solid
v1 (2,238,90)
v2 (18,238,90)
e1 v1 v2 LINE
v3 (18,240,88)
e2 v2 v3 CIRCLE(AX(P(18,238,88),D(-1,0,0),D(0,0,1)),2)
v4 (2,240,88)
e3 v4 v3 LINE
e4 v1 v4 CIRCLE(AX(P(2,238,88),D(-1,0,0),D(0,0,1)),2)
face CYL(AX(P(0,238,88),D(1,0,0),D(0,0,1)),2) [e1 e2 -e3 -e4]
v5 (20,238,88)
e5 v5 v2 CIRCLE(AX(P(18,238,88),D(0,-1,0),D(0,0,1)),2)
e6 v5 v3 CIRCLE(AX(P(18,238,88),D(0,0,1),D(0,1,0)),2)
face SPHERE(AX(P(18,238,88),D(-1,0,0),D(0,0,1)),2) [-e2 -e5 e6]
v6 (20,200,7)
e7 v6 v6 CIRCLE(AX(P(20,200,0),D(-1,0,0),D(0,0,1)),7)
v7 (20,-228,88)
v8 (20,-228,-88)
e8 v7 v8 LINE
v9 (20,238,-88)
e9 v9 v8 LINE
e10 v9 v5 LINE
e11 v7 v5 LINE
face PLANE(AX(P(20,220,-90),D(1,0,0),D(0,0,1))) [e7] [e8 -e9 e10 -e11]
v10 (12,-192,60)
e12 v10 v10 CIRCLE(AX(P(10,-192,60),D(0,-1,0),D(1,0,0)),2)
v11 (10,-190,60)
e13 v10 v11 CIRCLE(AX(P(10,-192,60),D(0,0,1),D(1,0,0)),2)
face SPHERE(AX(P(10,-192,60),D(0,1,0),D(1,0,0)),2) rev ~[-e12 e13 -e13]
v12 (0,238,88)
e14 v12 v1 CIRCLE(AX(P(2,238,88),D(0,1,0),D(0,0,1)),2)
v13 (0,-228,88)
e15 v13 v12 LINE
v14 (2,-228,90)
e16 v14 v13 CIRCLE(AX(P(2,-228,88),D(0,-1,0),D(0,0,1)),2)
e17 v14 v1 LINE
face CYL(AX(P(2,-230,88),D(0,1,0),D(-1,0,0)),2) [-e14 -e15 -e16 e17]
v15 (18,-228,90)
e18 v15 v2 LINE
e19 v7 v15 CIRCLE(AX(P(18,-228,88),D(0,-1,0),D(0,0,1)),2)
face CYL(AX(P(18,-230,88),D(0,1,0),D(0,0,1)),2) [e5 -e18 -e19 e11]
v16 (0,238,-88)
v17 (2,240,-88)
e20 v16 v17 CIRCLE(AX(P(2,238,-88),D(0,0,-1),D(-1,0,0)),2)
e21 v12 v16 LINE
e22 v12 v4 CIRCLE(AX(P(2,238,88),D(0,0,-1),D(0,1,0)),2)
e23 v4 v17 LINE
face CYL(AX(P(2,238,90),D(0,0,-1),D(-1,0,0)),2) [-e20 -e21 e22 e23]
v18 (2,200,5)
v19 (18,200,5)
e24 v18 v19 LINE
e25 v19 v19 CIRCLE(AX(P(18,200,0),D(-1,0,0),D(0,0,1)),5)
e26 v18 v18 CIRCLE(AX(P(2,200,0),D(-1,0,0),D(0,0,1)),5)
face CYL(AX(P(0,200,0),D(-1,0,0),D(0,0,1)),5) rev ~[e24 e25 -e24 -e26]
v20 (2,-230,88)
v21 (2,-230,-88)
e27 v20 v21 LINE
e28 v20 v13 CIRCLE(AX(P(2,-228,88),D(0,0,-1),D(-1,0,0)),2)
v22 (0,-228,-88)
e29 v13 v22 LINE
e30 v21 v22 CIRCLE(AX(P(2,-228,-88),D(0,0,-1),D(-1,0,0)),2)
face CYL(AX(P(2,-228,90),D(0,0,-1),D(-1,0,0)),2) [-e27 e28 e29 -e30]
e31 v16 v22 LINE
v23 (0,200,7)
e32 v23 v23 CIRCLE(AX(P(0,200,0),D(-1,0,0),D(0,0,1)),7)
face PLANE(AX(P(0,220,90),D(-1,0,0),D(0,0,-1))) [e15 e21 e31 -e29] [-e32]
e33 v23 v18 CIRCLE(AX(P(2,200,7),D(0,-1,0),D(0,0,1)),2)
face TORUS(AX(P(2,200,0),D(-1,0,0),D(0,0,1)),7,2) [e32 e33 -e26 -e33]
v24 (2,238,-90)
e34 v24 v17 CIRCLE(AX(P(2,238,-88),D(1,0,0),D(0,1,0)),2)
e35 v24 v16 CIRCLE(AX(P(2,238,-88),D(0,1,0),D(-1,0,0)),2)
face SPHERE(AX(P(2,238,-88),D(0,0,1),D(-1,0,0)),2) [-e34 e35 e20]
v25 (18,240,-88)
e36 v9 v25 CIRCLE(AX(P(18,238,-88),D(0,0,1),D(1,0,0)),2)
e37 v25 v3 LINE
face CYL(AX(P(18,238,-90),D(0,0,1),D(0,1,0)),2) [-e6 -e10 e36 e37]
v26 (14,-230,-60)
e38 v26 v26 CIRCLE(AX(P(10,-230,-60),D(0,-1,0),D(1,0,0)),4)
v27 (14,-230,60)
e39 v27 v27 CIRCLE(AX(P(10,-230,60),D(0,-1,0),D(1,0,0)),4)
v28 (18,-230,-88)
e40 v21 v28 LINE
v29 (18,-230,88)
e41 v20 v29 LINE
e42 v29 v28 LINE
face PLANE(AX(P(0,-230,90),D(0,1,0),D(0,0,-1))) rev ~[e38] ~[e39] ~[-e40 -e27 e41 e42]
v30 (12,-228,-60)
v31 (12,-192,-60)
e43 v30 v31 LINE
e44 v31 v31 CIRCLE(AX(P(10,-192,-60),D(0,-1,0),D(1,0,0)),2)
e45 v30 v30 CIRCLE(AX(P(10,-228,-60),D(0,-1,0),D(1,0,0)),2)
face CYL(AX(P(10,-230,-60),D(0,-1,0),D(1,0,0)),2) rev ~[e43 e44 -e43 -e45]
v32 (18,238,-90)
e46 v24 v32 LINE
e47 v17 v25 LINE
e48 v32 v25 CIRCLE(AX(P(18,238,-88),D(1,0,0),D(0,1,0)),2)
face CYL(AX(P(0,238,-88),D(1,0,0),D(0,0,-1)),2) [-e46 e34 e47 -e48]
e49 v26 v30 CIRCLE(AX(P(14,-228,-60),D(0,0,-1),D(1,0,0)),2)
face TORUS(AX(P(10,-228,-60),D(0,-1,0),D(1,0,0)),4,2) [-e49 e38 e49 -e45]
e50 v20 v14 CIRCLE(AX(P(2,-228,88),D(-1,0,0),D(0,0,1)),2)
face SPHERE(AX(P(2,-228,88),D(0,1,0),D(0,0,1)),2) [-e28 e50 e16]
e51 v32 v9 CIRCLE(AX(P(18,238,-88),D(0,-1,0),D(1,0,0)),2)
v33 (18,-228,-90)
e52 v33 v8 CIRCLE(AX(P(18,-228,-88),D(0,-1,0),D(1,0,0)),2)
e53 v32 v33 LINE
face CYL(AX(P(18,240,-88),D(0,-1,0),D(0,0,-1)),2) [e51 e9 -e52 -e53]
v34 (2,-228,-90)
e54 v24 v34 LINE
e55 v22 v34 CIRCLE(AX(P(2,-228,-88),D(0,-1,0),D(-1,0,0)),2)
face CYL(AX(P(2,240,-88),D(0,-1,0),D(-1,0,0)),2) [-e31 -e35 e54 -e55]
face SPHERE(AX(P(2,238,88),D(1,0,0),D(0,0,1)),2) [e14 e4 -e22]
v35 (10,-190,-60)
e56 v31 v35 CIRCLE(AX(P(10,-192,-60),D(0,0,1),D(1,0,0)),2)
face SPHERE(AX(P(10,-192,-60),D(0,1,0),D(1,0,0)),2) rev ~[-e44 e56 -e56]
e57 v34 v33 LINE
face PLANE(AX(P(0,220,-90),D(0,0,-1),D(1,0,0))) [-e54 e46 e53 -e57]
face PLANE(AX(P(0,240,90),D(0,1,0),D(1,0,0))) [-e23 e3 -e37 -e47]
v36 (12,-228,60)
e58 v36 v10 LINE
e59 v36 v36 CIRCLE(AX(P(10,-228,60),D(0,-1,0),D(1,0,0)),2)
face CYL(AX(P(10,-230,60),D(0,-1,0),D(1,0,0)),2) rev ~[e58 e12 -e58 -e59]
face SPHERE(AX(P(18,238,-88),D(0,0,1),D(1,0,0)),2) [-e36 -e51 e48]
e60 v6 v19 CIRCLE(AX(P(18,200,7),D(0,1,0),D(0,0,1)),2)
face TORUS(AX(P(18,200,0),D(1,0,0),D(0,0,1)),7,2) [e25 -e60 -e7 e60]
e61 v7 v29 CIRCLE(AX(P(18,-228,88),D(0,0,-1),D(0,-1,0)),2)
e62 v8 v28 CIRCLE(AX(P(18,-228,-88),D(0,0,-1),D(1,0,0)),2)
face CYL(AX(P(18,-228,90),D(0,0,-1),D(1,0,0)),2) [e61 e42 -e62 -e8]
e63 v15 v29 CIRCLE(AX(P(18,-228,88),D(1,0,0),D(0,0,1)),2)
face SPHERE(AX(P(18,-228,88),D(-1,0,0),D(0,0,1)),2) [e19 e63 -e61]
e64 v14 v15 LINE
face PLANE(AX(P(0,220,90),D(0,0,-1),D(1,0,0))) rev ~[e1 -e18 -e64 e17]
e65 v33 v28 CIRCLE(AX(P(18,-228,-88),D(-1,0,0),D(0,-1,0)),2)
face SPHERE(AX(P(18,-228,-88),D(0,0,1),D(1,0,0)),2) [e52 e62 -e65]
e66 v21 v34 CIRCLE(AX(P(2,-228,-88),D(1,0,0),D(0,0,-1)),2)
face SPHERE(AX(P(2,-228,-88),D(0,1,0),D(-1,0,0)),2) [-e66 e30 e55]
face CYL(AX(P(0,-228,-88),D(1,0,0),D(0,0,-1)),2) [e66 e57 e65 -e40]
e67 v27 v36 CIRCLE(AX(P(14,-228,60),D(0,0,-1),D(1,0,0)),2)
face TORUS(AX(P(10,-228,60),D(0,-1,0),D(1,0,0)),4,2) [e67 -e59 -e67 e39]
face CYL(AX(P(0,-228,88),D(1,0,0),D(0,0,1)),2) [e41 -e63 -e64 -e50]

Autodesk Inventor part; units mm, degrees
ref_plane "YZ Plane" through (0, 0, 0) normal (1, 0, 0) x (0, 1, 0)
ref_plane "XZ Plane" through (0, 0, 0) normal (0, 1, 0) x (-1, 0, 0)
ref_plane "XY Plane" through (0, 0, 0) normal (0, 0, 1) x (1, 0, 0)
sketch "草图1" plane through (0, 0, 0) normal (1, 0, 0) x (0, 1, 0)
  line L0 (230, 90) -> (-230, 90)
  line L1 (-230, 90) -> (-230, -90)
  line L2 (-230, -90) -> (230, -90)
  line L3 (230, -90) -> (230, 90)
  point P0 (0, 0)
  dimension "d0" = 460
  dimension "d1" = 180
extrude "拉伸1" add sketch "草图1" along normal blind 20
sketch "草图2" plane through (0, -230, -90) normal (0, -1, 0) x (1, 0, 0)
  circle A0 centre (10, 30) radius 2
  point P0 (0, 90)
  dimension "d4" = 4
extrude "拉伸2" cut sketch "草图2" against normal blind 40
sketch "草图3" plane through (0, -230, -90) normal (0, -1, 0) x (1, 0, 0)
  circle A0 centre (10, 150) radius 2
  point P0 (0, 90)
  dimension "d7" = 4
extrude "拉伸3" cut sketch "草图3" against normal blind 40
sketch "草图4" plane through (0, 230, 90) normal (0, 1, 0) x (1, 0, 0)
  line L0 (20, 0) -> (20, 180) projected
  line L1 (0, 0) -> (20, 0)
  line L2 (20, 0) -> (20, 180)
  line L3 (20, 180) -> (0, 180)
  line L4 (0, 180) -> (0, 0)
  point P0 (0, 90)
extrude "拉伸4" cut sketch "草图4" against normal blind 60
sketch "草图5" plane through (0, 170, 90) normal (0, 1, 0) x (1, 0, 0)
  line L0 (0, 0) -> (0, 180) projected
  line L1 (0, 0) -> (20, 0) projected
  line L2 (0, 180) -> (20, 180)
  line L3 (20, 180) -> (20, 0)
  line L4 (20, 0) -> (0, 0)
  line L5 (0, 0) -> (0, 180)
  point P0 (0, 90)
extrude "拉伸5" add sketch "草图5" along normal blind 50
sketch "草图6" plane through (0, 0, 0) normal (-1, 0, 0) x (0, 0, 1)
  circle A0 centre (0, 200) radius 5
  point P0 (0, 0)
  dimension "d14" = 10
extrude "拉伸6" cut sketch "草图6" against normal through all
sketch "草图7" plane through (0, 220, 90) normal (0, 1, 0) x (1, 0, 0)
  line L0 (0, 0) -> (20, 0) projected
  line L1 (20, 0) -> (0, 0)
  line L2 (0, 0) -> (0, 180)
  line L3 (0, 180) -> (20, 180)
  line L4 (20, 180) -> (20, 0)
  point P0 (0, 90)
extrude "拉伸7" add sketch "草图7" along normal blind 20
fillet "圆角1" radius 2 2 edges at (8, -190, 60) (8, -190, -60)
fillet "圆角1" radius 2 16 edges at (10, 240, 90) (0, 5, 90) (10, -230, 90) (20, 5, 90) (20, 240, 0) (20, -230, 0) (20, 5, -90) (20, 200, -5) (0, 240, 0) (0, 5, -90) (0, -230, 0) (0, 200, -5) (10, 240, -90) (10, -230, -90) (8, -230, 60) (8, -230, -60)
properties part number "内层正板"
